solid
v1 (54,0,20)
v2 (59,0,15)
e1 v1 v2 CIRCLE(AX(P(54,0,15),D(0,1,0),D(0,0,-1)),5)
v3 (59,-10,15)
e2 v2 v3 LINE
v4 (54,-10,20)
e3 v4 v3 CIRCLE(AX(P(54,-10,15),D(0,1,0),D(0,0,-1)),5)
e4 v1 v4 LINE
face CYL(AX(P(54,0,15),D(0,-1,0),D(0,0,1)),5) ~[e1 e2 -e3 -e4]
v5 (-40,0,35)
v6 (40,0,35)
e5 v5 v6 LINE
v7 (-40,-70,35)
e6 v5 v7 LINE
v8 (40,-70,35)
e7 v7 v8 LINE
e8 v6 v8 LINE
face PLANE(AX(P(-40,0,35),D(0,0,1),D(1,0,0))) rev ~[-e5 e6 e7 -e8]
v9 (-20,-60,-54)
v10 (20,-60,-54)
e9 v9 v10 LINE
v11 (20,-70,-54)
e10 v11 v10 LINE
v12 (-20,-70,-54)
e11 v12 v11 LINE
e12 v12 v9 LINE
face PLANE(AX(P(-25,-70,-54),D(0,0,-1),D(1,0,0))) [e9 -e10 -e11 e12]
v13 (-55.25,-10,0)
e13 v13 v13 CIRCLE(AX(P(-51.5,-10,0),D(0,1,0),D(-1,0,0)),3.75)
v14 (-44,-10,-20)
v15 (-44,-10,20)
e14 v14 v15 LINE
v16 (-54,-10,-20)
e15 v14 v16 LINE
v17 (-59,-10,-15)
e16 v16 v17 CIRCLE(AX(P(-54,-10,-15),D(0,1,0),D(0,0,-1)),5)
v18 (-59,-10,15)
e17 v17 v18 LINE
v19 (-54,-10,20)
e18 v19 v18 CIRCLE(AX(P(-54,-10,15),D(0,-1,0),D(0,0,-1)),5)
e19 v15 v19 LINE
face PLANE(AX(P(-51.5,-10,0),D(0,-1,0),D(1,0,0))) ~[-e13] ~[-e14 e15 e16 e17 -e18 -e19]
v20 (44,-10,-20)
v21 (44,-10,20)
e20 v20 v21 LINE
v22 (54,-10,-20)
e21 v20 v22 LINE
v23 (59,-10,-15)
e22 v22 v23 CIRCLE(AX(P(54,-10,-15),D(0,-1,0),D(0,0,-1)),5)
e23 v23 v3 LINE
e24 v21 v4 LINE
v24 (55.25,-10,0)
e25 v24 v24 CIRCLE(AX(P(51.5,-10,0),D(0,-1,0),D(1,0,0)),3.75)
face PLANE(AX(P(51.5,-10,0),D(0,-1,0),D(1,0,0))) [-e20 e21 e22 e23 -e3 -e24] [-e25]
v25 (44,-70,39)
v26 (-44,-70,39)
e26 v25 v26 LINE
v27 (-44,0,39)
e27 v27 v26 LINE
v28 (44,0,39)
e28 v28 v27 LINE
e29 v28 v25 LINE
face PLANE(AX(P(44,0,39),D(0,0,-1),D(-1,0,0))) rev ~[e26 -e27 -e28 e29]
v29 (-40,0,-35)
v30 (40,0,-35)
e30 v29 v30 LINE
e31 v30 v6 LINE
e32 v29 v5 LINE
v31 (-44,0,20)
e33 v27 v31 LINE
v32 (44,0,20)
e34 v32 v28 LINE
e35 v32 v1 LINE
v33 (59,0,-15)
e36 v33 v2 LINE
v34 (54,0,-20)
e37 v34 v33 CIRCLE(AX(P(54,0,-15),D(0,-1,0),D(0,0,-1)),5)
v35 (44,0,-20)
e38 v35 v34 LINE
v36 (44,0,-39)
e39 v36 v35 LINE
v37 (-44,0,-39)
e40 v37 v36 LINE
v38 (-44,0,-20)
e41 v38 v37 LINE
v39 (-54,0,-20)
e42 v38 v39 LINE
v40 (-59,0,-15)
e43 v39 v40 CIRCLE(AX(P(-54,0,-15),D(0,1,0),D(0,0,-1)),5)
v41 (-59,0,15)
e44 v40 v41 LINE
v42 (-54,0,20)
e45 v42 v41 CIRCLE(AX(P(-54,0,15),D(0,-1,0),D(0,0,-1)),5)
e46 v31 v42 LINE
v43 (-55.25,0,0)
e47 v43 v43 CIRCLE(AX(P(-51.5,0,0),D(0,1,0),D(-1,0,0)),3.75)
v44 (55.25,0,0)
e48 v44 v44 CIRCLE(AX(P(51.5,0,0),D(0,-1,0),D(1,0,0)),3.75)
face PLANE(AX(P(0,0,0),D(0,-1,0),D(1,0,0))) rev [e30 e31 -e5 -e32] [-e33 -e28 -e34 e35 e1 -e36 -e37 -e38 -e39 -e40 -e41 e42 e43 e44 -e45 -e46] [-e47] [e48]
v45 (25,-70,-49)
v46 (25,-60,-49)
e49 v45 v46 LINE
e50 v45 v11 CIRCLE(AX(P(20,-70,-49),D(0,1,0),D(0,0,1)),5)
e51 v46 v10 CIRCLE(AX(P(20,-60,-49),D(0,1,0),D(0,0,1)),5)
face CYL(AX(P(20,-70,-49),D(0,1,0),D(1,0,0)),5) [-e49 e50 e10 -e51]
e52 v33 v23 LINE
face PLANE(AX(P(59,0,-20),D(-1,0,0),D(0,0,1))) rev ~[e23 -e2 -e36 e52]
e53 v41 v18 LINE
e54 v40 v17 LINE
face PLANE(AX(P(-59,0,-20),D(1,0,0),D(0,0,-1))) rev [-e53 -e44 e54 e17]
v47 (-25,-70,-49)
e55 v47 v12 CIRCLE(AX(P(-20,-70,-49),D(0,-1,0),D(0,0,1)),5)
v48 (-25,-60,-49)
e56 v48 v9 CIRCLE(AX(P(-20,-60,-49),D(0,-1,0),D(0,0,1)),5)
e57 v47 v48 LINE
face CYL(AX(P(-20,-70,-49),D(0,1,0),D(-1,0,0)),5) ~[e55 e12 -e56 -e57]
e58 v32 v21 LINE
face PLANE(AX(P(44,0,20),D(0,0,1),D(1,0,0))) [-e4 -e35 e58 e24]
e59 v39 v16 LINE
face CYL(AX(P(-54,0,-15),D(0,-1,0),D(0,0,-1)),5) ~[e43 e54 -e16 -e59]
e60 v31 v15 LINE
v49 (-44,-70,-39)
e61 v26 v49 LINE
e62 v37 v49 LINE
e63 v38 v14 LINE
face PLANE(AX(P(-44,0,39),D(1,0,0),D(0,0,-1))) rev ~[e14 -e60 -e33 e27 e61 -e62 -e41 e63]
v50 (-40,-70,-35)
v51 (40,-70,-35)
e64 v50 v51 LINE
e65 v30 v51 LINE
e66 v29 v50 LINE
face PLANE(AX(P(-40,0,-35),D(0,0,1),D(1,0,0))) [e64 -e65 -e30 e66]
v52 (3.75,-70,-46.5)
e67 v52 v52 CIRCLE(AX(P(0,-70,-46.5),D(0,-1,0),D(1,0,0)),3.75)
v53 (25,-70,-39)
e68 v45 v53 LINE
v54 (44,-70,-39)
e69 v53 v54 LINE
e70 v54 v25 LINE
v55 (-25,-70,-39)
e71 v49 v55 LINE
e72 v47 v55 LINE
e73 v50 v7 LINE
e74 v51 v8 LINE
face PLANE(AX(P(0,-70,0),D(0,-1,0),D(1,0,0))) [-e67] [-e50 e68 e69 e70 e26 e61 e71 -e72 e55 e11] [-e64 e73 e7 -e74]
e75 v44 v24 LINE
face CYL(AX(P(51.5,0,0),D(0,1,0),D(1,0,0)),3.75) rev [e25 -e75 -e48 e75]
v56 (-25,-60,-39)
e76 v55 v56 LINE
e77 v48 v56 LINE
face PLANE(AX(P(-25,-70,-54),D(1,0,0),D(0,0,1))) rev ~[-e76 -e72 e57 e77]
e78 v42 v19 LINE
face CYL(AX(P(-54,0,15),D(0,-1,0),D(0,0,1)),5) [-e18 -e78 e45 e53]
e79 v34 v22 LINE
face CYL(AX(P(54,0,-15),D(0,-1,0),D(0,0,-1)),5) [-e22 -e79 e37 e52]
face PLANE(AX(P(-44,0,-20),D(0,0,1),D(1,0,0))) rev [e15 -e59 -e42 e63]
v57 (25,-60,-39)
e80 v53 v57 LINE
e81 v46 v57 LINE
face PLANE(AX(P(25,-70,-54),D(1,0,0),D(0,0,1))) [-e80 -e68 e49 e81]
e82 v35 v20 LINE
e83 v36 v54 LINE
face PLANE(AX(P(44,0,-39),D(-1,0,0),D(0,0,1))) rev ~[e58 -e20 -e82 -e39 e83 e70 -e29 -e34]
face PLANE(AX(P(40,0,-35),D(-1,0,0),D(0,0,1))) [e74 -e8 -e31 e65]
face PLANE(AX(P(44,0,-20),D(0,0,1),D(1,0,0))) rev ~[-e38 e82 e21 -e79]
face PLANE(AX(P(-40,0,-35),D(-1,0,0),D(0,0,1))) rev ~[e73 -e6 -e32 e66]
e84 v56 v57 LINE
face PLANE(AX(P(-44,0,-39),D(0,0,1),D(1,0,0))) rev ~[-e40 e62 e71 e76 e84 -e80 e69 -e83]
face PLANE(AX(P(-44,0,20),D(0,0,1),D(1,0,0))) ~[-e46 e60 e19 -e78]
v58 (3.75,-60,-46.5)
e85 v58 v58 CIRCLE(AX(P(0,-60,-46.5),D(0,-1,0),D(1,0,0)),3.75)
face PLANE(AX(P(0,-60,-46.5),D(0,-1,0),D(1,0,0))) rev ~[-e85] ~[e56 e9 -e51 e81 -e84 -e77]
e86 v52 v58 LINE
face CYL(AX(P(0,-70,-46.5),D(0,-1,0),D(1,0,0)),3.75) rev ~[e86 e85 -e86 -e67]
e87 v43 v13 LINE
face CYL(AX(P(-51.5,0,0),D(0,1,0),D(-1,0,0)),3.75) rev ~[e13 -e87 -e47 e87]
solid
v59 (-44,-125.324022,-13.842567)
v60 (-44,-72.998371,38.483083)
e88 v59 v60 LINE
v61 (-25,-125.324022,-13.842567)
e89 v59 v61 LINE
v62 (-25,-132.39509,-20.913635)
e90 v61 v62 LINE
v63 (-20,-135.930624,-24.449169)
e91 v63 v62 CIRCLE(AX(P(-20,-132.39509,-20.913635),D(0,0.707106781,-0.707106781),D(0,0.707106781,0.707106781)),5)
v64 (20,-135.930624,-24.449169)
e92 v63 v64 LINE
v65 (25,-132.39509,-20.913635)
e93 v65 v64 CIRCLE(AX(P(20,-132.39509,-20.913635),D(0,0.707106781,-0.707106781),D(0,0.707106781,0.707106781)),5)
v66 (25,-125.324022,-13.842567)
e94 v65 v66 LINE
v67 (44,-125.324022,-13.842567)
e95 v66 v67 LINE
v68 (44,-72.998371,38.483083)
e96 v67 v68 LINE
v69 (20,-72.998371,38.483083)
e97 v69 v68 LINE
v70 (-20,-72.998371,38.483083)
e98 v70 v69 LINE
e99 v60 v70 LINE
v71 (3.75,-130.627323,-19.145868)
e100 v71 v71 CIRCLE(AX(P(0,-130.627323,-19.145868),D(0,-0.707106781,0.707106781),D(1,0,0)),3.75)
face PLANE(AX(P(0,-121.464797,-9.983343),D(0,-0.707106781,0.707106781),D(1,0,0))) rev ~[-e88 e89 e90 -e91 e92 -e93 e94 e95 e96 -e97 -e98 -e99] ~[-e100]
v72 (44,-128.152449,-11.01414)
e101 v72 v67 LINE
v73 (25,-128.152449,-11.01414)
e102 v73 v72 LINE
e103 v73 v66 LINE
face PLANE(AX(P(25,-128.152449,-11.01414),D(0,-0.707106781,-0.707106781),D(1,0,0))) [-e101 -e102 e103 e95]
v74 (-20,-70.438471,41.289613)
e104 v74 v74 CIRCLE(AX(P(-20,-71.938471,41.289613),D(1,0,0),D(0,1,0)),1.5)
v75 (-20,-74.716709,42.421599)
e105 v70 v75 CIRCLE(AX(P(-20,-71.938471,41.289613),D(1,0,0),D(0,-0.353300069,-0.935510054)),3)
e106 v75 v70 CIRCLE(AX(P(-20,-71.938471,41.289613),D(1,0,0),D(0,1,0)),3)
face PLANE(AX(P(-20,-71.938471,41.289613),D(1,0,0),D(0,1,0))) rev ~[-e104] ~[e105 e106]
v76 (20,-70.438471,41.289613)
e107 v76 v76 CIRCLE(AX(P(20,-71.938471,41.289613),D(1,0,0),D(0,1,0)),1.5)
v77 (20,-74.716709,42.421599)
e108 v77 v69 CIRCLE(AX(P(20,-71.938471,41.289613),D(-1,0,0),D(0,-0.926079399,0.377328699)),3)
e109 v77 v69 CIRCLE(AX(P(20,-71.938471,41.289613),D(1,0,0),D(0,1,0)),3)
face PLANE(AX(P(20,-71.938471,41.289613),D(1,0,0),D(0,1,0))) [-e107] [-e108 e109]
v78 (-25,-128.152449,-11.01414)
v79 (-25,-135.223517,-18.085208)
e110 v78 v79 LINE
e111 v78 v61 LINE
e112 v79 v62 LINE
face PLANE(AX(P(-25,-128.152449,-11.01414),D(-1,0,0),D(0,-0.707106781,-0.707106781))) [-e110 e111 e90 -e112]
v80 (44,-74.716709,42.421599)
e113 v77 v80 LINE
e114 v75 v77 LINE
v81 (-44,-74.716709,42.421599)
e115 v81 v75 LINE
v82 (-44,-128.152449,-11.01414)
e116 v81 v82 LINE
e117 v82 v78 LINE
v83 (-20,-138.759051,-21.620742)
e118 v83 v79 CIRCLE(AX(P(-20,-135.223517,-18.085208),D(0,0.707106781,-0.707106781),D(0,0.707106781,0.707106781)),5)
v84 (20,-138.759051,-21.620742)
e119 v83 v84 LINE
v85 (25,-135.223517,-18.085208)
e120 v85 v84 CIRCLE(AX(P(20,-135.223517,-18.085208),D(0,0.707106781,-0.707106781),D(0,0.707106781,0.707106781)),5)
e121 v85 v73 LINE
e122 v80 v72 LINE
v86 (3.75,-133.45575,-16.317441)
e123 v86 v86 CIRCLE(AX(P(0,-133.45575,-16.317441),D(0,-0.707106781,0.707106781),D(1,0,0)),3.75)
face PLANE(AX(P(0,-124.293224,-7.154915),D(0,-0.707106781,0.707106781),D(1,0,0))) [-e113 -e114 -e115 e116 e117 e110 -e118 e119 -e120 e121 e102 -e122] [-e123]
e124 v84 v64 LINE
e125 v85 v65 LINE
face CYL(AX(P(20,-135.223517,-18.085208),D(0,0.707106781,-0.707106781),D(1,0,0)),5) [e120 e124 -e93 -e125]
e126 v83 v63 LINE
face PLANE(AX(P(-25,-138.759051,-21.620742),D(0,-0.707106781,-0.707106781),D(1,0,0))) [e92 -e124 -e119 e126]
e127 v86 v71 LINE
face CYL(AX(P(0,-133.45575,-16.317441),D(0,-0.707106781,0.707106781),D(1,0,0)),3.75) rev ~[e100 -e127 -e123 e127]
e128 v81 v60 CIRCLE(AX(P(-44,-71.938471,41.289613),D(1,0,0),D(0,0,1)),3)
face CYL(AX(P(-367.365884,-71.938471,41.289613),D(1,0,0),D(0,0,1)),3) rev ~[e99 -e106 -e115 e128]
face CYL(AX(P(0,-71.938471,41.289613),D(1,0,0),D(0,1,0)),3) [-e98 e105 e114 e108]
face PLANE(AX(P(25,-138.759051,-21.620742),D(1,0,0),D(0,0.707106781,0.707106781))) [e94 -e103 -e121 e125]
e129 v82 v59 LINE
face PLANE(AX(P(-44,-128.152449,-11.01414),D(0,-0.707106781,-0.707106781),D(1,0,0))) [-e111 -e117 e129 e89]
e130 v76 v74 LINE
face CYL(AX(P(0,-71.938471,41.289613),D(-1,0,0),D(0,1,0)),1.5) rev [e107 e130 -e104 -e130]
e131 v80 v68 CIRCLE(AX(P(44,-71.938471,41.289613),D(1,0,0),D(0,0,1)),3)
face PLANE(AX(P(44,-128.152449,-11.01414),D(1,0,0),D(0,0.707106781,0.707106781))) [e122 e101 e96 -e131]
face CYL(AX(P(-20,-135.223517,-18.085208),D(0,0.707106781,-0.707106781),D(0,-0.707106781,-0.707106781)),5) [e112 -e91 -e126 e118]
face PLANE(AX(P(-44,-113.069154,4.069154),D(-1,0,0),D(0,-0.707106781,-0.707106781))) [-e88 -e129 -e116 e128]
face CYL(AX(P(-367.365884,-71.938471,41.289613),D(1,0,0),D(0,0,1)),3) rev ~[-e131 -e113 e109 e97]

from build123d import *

# Parameters (mm, degrees)
F0_W           = 80
F0_H           = 70
F1_DEPTH       = 70
F0_W_2         = 15
F0_H_2         = 40
F0_R           = 3.75
F2_DEPTH       = 10
F3_R           = 5
F6_W           = 50
F6_H           = 15
F6_R           = 3.75
F7_DEPTH       = 10
F8_R           = 5
F9_R           = 3
F9_R_2         = 1.5
F10_DEPTH      = 20
F13_END_RADIUS = 3
F12_W          = 88
F12_H          = 4
F13_REACH      = 196.483987292
F14_R          = 3.75
F15_DEPTH      = 4
F16_R          = 5


with BuildPart() as f1:
    # F0 (on Front) → F1 (new body)
    with BuildSketch(Plane.XZ):
        Polygon((44, 39), (-44, 39), (-44, -39), (44, -39), (44, -20), (44, 20), align=None)
        Rectangle(F0_W, F0_H, mode=Mode.SUBTRACT)
    extrude(amount=F1_DEPTH)

    # F0 (on Front) → F2 (join)
    with BuildSketch(Plane.XZ):
        with Locations((51.5, 0)):
            Rectangle(F0_W_2, F0_H_2)
        with Locations((51.5, 0)):
            Circle(F0_R, mode=Mode.SUBTRACT)
    extrude(amount=F2_DEPTH)

    # F3
    f3_edges = [f1.edges().sort_by_distance(p)[0] for p in [
        (59, -5, 20),
        (59, -5, -20),
    ]]
    fillet(f3_edges, radius=F3_R)

    # F4: F1 across plane


with BuildPart() as f1_1:
    add(f1.part)
    add(f1.part.mirror(Plane.YZ))

    # F6 (on face) → F7 (join)
    with BuildSketch(Plane.XZ.offset(70)):
        with Locations((0, -46.5)):
            Rectangle(F6_W, F6_H)
        with Locations((0, -46.5)):
            Circle(F6_R, mode=Mode.SUBTRACT)
    extrude(amount=-F7_DEPTH)

    # F8
    f8_edges = [f1_1.edges().sort_by_distance(p)[0] for p in [
        (25, -65, -54),
        (-25, -65, -54),
    ]]
    fillet(f8_edges, radius=F8_R)


with BuildPart() as f10:
    # F9 (on Right) → F10 (new body, symmetric)
    with BuildSketch(Plane.YZ):
        with Locations((-71.9384711885, 41.2896133847)):
            Circle(F9_R)
        with Locations((-71.9384711885, 41.2896133847)):
            Circle(F9_R_2, mode=Mode.SUBTRACT)
    extrude(amount=F10_DEPTH, both=True)

    f13_end = (Plane(origin=(0, -71.9384711885, 41.2896133847), x_dir=(0, 0, 1), z_dir=(1, 0, 0)) * Cylinder(F13_END_RADIUS, 734.7317676539, mode=Mode.PRIVATE)).faces().sort_by_distance((0, -74.9384711885, 41.2896133847))[0]
    # F12 (on face) → F13 (join, up to the whole of a round face its end follows)
    with BuildSketch(Plane(origin=(0, -54.5, -54.5), x_dir=(-1, 0, 0), z_dir=(0, 0.7071067812, 0.7071067812))):
        with Locations((0, 80.8292925358)):
            Rectangle(F12_W, F12_H)
    f13_long = extrude(amount=F13_REACH, mode=Mode.PRIVATE)
    add(split(f13_long, bisect_by=f13_end, keep=Keep.ALL, mode=Mode.PRIVATE).solids().sort_by_distance((0, -111.6549408706, 2.6549408706))[0])

    # F14 (on face) → F15 (join)
    with BuildSketch(Plane(origin=(0, -58.5691544329, 58.5691544329), x_dir=(1, 0, 0), z_dir=(0, -0.7071067812, 0.7071067812))):
        Polygon((44, -77.0746391493), (-44, -77.0746391493), (-44, -98.4056391493), (-25, -98.4056391493), (-25, -113.4056391493), (25, -113.4056391493), (25, -98.4056391493), (44, -98.4056391493), align=None)
        with Locations((0, -105.9056391493)):
            Circle(F14_R, mode=Mode.SUBTRACT)
    extrude(amount=-F15_DEPTH)

    # F16
    f16_edges = [f10.edges().sort_by_distance(p)[0] for p in [
        (25, -137.344837, -23.034956),
        (-25, -137.344837, -23.034956),
    ]]
    fillet(f16_edges, radius=F16_R)


with BuildPart() as f10_1:
    # F17: moved
    add(f10.part)


solid = Compound([f1_1.part, f10_1.part])
